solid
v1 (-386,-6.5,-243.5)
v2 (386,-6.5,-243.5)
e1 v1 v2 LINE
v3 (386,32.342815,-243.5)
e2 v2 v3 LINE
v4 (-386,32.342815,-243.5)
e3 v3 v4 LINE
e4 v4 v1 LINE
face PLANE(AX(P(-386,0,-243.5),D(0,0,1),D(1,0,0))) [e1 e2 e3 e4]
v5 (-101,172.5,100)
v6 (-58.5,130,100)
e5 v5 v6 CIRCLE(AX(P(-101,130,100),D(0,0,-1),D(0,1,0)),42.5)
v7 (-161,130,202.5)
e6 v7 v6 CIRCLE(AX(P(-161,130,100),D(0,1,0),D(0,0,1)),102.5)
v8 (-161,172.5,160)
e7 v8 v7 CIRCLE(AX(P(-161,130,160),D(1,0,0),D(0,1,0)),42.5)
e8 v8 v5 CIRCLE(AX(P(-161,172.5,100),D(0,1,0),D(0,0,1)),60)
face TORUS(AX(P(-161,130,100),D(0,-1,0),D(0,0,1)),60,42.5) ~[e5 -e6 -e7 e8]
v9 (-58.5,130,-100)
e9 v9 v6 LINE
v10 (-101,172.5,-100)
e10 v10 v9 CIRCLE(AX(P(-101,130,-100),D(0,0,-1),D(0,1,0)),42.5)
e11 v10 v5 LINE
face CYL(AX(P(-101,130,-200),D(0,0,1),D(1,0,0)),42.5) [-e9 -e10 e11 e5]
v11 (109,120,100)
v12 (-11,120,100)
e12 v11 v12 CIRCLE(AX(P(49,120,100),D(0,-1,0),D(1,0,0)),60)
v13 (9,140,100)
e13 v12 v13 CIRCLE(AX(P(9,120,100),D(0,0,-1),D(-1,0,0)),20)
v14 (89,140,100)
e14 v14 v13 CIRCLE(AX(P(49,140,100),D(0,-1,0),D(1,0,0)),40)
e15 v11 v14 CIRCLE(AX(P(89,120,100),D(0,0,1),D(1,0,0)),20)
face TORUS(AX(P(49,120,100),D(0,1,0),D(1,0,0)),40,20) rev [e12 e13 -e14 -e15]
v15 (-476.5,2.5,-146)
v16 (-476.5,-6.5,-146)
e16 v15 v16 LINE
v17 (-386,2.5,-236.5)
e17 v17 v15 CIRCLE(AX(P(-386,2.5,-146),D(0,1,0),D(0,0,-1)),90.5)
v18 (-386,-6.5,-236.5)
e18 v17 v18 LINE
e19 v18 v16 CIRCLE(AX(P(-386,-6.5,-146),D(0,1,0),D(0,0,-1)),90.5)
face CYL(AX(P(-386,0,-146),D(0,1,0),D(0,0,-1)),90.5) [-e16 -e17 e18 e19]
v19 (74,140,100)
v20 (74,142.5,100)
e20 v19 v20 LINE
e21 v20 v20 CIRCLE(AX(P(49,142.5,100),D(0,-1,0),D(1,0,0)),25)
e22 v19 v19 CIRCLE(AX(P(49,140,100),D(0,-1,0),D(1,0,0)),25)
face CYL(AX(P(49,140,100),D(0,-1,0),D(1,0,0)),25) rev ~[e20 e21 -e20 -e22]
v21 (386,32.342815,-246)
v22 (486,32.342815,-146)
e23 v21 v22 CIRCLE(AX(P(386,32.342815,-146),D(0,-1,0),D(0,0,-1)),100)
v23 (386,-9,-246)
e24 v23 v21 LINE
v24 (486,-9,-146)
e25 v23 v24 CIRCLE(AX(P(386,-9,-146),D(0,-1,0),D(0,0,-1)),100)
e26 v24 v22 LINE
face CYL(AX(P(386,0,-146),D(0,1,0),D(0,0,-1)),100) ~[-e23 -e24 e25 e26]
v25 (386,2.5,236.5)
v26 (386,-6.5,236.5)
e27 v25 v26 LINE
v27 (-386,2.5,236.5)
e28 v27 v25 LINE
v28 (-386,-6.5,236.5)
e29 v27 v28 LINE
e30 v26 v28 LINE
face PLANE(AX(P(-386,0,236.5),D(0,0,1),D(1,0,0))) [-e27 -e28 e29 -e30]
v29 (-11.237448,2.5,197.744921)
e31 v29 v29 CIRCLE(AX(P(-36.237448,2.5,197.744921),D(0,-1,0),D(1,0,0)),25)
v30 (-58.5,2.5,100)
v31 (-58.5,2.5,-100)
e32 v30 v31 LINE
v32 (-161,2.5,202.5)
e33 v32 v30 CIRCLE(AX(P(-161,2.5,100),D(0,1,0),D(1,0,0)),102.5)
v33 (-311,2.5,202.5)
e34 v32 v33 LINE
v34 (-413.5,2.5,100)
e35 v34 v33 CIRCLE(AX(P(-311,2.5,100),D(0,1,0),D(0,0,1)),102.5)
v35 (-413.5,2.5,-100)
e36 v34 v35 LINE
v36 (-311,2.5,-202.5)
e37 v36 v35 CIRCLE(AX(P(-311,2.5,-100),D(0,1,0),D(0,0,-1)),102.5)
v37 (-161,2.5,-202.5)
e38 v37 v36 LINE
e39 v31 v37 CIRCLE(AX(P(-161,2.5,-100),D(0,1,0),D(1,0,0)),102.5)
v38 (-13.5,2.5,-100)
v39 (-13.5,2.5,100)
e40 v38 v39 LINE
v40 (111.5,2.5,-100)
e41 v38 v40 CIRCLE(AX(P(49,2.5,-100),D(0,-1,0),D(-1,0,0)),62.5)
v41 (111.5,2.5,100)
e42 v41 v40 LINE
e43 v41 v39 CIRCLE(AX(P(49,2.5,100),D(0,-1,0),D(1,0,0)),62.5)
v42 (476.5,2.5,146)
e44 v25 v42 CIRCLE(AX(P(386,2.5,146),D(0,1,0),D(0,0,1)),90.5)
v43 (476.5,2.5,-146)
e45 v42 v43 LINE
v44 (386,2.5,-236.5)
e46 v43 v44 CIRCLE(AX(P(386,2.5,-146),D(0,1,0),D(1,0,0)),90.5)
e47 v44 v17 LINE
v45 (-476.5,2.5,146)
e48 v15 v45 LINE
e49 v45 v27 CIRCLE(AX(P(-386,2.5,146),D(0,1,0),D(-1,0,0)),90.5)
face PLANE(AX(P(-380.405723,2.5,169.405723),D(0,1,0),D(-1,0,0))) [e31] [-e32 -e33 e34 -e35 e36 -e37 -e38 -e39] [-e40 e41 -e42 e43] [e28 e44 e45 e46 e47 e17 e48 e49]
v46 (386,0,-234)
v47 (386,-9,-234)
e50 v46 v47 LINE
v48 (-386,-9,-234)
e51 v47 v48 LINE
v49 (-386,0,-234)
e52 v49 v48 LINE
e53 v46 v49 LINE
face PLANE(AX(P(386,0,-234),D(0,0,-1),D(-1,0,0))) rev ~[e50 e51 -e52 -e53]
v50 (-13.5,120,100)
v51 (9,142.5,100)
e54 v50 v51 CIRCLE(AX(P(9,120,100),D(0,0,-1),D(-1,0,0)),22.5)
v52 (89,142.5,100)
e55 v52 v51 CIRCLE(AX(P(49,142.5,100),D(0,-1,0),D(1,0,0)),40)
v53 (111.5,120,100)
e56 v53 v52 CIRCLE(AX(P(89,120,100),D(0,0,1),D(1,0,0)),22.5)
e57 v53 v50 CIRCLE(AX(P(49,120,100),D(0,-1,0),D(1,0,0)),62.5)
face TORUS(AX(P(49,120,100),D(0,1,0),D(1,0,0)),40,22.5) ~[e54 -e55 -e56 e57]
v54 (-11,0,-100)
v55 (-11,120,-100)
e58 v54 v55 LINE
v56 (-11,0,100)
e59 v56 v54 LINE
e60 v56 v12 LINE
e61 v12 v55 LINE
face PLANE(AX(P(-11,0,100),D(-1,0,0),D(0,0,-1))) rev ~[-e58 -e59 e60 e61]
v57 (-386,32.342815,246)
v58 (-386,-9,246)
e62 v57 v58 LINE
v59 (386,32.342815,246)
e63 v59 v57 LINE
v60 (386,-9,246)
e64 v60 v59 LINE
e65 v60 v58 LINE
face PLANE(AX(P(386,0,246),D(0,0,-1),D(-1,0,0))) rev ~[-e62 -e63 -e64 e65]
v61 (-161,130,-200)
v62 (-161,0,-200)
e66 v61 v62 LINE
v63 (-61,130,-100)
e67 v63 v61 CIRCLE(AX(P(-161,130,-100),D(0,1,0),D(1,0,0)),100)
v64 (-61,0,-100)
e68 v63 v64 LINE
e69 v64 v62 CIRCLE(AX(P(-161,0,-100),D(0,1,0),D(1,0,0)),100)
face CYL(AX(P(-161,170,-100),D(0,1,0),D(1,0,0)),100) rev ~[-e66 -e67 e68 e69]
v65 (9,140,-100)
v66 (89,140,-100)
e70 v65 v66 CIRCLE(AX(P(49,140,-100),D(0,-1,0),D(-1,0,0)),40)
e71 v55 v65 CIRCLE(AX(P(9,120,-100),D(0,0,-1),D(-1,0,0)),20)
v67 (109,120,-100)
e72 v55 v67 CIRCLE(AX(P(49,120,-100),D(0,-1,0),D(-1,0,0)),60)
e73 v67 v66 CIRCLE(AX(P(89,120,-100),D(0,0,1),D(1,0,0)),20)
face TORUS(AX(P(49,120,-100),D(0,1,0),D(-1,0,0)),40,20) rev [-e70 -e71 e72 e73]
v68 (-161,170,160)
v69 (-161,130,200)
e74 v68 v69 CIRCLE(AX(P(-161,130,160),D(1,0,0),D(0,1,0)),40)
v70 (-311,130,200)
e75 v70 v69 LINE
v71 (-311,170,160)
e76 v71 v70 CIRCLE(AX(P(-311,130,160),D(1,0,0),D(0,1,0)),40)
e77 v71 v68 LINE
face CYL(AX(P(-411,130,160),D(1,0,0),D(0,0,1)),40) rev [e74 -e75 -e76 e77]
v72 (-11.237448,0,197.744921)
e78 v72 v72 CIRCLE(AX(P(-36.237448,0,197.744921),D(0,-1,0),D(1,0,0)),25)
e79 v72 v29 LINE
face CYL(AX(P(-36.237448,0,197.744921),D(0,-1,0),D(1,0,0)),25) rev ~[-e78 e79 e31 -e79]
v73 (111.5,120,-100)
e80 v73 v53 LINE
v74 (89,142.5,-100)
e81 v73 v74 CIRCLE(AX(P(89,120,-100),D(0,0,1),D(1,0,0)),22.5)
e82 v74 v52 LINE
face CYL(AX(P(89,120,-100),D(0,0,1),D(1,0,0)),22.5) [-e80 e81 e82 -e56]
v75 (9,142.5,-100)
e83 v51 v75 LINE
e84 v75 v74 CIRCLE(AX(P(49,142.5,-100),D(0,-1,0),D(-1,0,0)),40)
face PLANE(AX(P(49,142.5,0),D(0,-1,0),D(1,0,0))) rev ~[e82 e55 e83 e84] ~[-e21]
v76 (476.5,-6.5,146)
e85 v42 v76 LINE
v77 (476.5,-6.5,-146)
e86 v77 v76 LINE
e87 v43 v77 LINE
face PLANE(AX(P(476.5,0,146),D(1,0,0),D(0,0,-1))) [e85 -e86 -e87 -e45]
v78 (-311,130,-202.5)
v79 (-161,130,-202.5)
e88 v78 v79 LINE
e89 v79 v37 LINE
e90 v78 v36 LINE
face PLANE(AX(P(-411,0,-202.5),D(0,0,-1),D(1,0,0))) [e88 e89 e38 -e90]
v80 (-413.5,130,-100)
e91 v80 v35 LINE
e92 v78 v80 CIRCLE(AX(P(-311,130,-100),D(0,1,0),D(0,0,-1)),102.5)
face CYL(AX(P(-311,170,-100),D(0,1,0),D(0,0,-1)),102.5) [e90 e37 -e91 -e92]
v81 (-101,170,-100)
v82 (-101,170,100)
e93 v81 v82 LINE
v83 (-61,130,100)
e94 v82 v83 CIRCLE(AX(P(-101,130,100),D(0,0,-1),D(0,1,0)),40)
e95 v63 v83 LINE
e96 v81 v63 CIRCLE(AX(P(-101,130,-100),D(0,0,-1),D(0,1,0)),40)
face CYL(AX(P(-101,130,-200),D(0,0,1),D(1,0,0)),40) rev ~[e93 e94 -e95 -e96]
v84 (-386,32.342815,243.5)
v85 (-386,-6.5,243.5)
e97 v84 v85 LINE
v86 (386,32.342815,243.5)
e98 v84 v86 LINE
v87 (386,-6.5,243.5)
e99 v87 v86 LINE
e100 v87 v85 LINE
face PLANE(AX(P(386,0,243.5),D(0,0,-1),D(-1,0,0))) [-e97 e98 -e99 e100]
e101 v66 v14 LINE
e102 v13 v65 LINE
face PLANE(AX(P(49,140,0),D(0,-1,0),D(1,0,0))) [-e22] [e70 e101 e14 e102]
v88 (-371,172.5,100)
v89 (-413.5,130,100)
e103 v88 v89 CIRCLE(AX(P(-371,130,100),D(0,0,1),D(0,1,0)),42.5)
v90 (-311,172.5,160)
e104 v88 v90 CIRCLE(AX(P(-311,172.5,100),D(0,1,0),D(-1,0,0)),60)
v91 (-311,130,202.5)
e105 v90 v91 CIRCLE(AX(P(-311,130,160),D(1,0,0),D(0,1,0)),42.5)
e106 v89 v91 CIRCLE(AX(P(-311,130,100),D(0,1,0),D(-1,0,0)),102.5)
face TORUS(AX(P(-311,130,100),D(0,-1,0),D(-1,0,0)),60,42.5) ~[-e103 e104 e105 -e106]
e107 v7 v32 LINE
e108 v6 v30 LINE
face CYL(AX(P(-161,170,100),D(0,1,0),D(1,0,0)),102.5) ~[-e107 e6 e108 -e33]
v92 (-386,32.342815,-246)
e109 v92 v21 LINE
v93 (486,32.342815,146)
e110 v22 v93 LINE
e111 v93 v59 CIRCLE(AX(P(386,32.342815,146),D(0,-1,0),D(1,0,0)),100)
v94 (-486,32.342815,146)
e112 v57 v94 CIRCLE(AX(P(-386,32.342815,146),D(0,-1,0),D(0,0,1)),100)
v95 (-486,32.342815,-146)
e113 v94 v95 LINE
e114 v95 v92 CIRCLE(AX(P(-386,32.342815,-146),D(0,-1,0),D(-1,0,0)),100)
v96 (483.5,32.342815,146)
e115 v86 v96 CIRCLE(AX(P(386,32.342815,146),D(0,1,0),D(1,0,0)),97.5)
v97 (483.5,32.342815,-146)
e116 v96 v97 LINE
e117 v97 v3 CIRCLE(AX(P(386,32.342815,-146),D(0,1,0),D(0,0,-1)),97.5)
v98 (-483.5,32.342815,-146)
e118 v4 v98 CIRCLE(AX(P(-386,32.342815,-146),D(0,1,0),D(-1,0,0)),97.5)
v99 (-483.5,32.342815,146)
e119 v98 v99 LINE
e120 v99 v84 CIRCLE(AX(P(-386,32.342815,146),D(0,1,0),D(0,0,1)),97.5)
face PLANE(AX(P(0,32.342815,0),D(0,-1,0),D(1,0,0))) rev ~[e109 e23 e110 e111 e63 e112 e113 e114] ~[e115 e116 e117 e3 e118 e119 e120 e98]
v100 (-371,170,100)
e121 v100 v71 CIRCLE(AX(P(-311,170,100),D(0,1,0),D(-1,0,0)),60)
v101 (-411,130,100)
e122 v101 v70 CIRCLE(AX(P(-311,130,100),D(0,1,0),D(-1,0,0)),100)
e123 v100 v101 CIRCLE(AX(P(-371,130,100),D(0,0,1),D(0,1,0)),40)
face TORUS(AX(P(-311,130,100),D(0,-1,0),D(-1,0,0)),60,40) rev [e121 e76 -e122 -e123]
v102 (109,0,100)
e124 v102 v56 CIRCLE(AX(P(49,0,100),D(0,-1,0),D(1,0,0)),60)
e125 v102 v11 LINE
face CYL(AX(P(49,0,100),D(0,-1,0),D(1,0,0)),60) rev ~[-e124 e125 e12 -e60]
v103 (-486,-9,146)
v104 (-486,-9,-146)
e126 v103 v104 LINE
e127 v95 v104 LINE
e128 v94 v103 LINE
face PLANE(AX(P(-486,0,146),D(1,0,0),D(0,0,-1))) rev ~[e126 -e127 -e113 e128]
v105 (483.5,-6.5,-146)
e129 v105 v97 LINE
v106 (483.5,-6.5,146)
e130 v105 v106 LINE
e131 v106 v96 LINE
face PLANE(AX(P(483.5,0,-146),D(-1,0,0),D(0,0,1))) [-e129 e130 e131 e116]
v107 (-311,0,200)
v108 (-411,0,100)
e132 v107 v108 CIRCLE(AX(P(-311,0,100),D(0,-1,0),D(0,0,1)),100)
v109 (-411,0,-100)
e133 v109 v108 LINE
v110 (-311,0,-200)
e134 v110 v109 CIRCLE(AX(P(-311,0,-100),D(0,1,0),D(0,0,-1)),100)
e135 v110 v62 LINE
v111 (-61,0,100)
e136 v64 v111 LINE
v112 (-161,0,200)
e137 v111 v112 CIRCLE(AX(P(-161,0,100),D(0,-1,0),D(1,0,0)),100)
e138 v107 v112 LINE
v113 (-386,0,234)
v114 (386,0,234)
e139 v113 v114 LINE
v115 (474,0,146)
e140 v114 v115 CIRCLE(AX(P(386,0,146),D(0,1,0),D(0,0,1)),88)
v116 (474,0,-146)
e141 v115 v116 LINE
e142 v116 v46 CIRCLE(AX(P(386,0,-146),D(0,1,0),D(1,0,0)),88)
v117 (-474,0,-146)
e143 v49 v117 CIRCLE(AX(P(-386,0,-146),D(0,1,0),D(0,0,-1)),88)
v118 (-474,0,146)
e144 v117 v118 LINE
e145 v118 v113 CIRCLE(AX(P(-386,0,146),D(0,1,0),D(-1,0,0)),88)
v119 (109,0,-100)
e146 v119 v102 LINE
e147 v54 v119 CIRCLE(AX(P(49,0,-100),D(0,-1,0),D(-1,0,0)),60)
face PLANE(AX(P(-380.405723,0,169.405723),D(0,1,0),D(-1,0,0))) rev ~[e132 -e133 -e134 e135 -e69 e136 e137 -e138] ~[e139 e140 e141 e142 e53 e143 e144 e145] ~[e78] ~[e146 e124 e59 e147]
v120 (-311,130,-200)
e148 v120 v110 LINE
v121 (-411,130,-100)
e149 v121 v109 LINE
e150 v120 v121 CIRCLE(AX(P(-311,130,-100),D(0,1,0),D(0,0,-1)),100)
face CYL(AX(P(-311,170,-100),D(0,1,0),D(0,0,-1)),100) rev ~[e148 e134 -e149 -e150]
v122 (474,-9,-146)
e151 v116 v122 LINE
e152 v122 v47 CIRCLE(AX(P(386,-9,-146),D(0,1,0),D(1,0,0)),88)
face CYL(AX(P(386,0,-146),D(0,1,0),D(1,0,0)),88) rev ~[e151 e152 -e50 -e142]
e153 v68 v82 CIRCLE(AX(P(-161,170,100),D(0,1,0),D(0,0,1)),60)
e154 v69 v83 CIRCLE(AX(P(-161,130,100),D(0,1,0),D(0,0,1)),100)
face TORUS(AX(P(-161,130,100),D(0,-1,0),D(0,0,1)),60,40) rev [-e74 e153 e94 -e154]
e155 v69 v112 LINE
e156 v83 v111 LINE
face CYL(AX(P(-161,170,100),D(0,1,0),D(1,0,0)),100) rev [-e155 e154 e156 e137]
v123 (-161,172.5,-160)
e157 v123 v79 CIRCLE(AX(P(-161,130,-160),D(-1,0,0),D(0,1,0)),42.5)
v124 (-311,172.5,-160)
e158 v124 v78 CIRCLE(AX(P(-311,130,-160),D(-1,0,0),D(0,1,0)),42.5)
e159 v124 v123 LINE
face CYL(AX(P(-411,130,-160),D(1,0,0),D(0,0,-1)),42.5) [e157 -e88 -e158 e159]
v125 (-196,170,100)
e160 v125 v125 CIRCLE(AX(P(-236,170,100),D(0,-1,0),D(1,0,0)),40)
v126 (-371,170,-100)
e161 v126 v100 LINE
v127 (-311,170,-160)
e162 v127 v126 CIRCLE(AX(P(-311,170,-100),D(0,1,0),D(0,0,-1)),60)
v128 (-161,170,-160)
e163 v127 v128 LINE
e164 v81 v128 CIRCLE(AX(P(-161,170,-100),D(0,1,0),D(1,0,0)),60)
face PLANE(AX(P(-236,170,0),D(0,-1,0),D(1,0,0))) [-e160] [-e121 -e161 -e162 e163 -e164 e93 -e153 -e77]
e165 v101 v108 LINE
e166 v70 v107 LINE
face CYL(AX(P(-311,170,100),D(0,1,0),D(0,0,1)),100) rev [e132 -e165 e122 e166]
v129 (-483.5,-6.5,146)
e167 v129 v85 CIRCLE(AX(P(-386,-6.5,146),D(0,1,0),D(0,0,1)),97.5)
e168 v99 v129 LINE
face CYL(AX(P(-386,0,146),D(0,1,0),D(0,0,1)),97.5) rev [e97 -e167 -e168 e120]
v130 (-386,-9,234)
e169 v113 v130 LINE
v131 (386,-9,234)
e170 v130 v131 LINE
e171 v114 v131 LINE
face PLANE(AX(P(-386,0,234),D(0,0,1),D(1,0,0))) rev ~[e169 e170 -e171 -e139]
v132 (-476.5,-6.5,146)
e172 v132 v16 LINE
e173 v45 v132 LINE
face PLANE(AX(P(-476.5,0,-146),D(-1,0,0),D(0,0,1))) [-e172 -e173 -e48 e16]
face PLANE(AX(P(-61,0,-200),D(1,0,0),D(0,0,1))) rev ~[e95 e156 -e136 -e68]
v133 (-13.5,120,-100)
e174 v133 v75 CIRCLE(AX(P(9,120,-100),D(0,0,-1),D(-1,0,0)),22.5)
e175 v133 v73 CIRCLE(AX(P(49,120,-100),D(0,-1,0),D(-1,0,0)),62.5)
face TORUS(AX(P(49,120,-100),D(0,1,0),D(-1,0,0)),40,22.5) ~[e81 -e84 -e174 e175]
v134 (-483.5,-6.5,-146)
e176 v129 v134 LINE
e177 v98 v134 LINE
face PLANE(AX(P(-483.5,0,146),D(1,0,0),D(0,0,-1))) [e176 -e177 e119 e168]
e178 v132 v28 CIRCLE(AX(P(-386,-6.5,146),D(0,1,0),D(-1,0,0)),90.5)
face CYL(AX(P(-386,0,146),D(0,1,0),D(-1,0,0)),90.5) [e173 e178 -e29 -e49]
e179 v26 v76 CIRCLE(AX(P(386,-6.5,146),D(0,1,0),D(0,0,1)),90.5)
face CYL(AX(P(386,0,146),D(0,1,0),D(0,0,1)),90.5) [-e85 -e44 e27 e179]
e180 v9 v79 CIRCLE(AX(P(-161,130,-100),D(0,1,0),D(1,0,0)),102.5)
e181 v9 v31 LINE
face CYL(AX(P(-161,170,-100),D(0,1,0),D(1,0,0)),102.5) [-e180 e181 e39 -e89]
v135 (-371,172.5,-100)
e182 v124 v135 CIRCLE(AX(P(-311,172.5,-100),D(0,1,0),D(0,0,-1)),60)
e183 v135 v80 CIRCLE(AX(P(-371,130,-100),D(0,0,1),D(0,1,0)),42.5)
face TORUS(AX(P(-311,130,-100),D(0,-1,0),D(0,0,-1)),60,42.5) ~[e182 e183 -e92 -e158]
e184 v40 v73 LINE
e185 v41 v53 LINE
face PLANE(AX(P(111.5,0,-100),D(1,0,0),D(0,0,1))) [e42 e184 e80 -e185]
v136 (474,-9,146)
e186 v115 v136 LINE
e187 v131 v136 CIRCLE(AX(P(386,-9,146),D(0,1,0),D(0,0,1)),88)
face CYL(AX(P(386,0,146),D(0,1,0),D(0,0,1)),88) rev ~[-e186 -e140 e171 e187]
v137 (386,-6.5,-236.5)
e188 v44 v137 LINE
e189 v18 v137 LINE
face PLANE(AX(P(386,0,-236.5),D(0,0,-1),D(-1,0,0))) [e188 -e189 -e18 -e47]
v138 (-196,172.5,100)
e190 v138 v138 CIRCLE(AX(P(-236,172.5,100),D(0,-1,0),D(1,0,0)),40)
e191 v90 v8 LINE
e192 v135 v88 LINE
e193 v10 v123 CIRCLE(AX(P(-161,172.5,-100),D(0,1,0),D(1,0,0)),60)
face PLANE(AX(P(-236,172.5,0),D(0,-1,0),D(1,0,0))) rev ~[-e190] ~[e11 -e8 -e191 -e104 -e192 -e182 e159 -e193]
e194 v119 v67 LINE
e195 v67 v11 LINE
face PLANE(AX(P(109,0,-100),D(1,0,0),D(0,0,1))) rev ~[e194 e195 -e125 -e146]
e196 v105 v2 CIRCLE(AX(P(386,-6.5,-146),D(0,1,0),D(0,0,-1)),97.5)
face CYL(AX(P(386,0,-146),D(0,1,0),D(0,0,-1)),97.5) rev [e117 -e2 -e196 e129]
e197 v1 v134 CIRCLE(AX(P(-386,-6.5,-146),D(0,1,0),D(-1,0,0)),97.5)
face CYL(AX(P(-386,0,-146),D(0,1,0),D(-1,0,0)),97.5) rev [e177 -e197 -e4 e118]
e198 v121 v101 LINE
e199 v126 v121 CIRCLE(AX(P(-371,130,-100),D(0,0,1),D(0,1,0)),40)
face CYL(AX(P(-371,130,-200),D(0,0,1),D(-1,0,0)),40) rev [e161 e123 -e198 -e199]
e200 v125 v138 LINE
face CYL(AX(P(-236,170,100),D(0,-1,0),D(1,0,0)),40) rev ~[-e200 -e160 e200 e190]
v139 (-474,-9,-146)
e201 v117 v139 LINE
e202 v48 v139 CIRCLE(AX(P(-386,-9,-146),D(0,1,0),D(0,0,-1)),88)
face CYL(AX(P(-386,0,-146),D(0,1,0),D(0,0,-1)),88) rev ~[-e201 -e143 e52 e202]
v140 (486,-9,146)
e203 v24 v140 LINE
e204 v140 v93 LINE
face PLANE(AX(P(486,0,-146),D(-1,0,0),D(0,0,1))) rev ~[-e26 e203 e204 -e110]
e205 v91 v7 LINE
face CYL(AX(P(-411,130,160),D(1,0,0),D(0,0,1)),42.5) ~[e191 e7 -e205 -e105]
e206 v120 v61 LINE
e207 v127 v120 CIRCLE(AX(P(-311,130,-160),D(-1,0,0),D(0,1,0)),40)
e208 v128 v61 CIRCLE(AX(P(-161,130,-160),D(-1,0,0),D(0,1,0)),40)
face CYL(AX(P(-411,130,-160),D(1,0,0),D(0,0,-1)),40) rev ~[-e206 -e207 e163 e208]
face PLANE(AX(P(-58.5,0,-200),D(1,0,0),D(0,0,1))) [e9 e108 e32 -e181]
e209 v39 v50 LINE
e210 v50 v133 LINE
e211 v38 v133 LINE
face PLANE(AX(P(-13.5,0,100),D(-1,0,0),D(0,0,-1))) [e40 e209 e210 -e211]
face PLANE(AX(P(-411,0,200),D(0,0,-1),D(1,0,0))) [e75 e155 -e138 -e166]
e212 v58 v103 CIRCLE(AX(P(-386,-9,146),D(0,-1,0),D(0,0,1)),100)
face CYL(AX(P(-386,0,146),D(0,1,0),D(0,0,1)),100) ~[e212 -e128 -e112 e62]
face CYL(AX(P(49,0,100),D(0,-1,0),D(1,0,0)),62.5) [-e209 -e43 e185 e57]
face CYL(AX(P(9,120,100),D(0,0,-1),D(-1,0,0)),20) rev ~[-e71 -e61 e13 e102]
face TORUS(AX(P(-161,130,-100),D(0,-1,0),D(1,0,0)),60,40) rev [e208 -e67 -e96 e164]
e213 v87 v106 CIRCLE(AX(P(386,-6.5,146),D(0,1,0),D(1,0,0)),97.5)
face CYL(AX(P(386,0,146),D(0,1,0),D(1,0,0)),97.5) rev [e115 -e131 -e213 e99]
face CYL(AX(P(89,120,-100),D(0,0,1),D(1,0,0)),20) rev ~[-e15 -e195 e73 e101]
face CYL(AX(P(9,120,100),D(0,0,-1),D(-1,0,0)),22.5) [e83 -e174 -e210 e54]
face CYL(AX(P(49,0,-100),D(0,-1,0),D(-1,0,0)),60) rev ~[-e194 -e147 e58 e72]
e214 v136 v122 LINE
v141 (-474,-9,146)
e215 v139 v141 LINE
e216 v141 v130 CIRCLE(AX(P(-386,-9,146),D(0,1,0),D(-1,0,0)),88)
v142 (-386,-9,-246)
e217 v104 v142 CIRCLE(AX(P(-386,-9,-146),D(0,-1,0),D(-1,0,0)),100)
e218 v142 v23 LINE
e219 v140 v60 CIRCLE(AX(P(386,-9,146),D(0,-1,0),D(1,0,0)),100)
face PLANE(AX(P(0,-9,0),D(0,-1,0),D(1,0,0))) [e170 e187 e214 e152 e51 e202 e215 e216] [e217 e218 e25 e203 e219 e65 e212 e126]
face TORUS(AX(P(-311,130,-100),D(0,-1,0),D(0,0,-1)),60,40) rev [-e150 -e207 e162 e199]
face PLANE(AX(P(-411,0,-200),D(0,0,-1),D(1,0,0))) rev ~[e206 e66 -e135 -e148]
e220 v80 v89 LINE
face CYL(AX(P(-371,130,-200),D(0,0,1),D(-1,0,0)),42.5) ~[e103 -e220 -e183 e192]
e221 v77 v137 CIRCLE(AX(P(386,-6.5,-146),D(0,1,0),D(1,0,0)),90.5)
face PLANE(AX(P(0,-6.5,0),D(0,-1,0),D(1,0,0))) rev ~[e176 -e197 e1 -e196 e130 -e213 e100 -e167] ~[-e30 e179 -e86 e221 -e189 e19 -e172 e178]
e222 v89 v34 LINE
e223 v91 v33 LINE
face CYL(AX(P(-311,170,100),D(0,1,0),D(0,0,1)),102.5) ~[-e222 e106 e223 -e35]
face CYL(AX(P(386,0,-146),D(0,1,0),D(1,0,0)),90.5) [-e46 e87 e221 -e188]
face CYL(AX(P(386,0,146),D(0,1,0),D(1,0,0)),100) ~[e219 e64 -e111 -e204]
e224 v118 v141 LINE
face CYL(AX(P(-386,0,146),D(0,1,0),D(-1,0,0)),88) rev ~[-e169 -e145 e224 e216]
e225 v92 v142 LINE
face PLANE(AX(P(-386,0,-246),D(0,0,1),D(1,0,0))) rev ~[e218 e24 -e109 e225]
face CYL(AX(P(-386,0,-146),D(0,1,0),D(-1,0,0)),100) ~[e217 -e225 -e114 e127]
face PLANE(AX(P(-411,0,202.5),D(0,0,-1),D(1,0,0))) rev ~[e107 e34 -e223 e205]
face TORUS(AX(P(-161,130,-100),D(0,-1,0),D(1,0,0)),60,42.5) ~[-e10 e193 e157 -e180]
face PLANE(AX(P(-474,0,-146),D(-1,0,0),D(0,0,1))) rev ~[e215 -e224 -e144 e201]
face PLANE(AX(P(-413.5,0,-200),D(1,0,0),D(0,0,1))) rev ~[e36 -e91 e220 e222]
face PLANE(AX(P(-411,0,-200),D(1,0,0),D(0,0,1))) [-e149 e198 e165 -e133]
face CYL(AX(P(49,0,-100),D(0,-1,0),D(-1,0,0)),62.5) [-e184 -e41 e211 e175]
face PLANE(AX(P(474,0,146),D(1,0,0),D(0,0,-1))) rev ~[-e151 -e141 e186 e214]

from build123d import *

# Parameters (mm, degrees)
F1_DEPTH     = 300
F2_W         = 350
F2_H         = 400
F3_DEPTH     = 170
F4_R         = 40
F5_T1_DEPTH  = 170
F5_T4_ANGLE  = 90
F5_T6_ANGLE  = 90
F5_T8_ANGLE  = 90
F5_T10_ANGLE = 90
F7_DEPTH     = 140
F8_R         = 20
F10_DEPTH    = 9
F11_T        = -2.5
F12_DEPTH    = 267.6571849734
F13_R        = 40
F14_DEPTH    = 2.501
F15_R        = 25
F16_DEPTH    = 32.501
F17_R        = 25
F18_DEPTH    = 172.501


# Not quite as in the source:
# - a fillet or chamfer that OpenCascade refuses, or shapes differently, is made with other operations: its cross-section is extruded or revolved along the edge and cut away or added


with BuildPart() as f1:
    # F0 (on Front) → F1 (new body)
    with BuildSketch(Plane.XZ):
        with BuildLine():
            Line((-386, -246), (386, -246))
            ThreePointArc((386, -246), (456.7106781187, -216.7106781187), (486, -146))
            Line((486, -146), (486, 146))
            ThreePointArc((486, 146), (456.7106781187, 216.7106781187), (386, 246))
            Line((386, 246), (-386, 246))
            ThreePointArc((-386, 246), (-456.7106781187, 216.7106781187), (-486, 146))
            Line((-486, 146), (-486, -146))
            ThreePointArc((-486, -146), (-456.7106781187, -216.7106781187), (-386, -246))
        make_face()
    extrude(amount=-F1_DEPTH)

    # F2 (on face) → F3 (cut)
    with BuildSketch(Plane.XZ):
        with Locations((-236, 0)):
            Rectangle(F2_W, F2_H)
    extrude(amount=-F3_DEPTH, mode=Mode.SUBTRACT)

    # F4
    f4_edges = [f1.edges().sort_by_distance(p)[0] for p in [
        (-61, 170, 0),
        (-236, 170, 200),
        (-411, 170, 0),
        (-236, 170, -200),
    ]]
    fillet(f4_edges, radius=F4_R)

    # F5: fillet of radius 100 on 4 edges, made by hand

    # F5_s2 → F5_t1 (join)
    with BuildSketch(Plane.XZ.offset(-170)):
        with BuildLine():
            ThreePointArc((-311, 200), (-381.7106781187, 170.7106781187), (-411, 100))
            Line((-411, 100), (-411, 200))
            Line((-411, 200), (-311, 200))
        make_face()
        with BuildLine():
            ThreePointArc((-311, -200), (-381.7106781187, -170.7106781187), (-411, -100))
            Line((-411, -100), (-411, -200))
            Line((-411, -200), (-311, -200))
        make_face()
        with BuildLine():
            ThreePointArc((-61, 100), (-90.2893218813, 170.7106781187), (-161, 200))
            Line((-161, 200), (-61, 200))
            Line((-61, 200), (-61, 100))
        make_face()
        with BuildLine():
            ThreePointArc((-61, -100), (-90.2893218813, -170.7106781187), (-161, -200))
            Line((-161, -200), (-61, -200))
            Line((-61, -200), (-61, -100))
        make_face()
    extrude(amount=F5_T1_DEPTH)

    # F5_s3 → F5_t4 (revolve)
    with BuildSketch(Plane.XY.offset(-100)):
        with BuildLine():
            ThreePointArc((-101, 170), (-72.7157287525, 158.2842712475), (-61, 130))
            Line((-61, 130), (-61, 170))
            Line((-61, 170), (-101, 170))
        make_face()
    revolve(axis=Axis((-161, 170, -100), (0, 1, 0)), revolution_arc=F5_T4_ANGLE)

    # F5_s5 → F5_t6 (revolve)
    with BuildSketch(Plane.YZ.offset(-161)):
        with BuildLine():
            ThreePointArc((170, 160), (158.2842712475, 188.2842712475), (130, 200))
            Line((130, 200), (170, 200))
            Line((170, 200), (170, 160))
        make_face()
    revolve(axis=Axis((-161, 170, 100), (0, 1, 0)), revolution_arc=F5_T6_ANGLE)

    # F5_s7 → F5_t8 (revolve)
    with BuildSketch(Plane.YZ.offset(-311)):
        with BuildLine():
            ThreePointArc((170, -160), (158.2842712475, -188.2842712475), (130, -200))
            Line((130, -200), (170, -200))
            Line((170, -200), (170, -160))
        make_face()
    revolve(axis=Axis((-311, 170, -100), (0, 1, 0)), revolution_arc=F5_T8_ANGLE)

    # F5_s9 → F5_t10 (revolve)
    with BuildSketch(Plane.XY.offset(100)):
        with BuildLine():
            ThreePointArc((-371, 170), (-399.2842712475, 158.2842712475), (-411, 130))
            Line((-411, 130), (-411, 170))
            Line((-411, 170), (-371, 170))
        make_face()
    revolve(axis=Axis((-311, 170, 100), (0, 1, 0)), revolution_arc=F5_T10_ANGLE)

    # F6 (on face) → F7 (cut)
    with BuildSketch(Plane.XZ):
        with BuildLine():
            ThreePointArc((-11, -100), (49, -160), (109, -100))
            Line((109, -100), (109, 100))
            ThreePointArc((109, 100), (49, 160), (-11, 100))
            Line((-11, 100), (-11, -100))
        make_face()
    extrude(amount=-F7_DEPTH, mode=Mode.SUBTRACT)

    # F8
    f8_edges = [f1.edges().sort_by_distance(p)[0] for p in [
        (49, 140, -160),
        (109, 140, 0),
        (49, 140, 160),
        (-11, 140, 0),
    ]]
    fillet(f8_edges, radius=F8_R)

    # F9 (on face) → F10 (join)
    with BuildSketch(Plane.XZ):
        with BuildLine():
            Line((386, 246), (-386, 246))
            ThreePointArc((-386, 246), (-456.7106781187, 216.7106781187), (-486, 146))
            Line((-486, 146), (-486, -146))
            ThreePointArc((-486, -146), (-456.7106781187, -216.7106781187), (-386, -246))
            Line((-386, -246), (386, -246))
            ThreePointArc((386, -246), (456.7106781187, -216.7106781187), (486, -146))
            Line((486, -146), (486, 146))
            ThreePointArc((486, 146), (456.7106781187, 216.7106781187), (386, 246))
        make_face()
        with BuildLine():
            ThreePointArc((386, 234), (448.2253967444, 208.2253967444), (474, 146))
            Line((474, 146), (474, -146))
            ThreePointArc((474, -146), (448.2253967444, -208.2253967444), (386, -234))
            Line((386, -234), (-386, -234))
            ThreePointArc((-386, -234), (-448.2253967444, -208.2253967444), (-474, -146))
            Line((-474, -146), (-474, 146))
            ThreePointArc((-474, 146), (-448.2253967444, 208.2253967444), (-386, 234))
            Line((-386, 234), (386, 234))
        make_face(mode=Mode.SUBTRACT)
    extrude(amount=F10_DEPTH)

    # F11
    f11_openings = [f1.faces().sort_by_distance(p)[0] for p in [
        (0, 300, 0),
    ]]
    offset(amount=F11_T, openings=f11_openings, kind=Kind.INTERSECTION)

    # F12 (cut): a face of the model
    f12_faces = [f1.faces().sort_by_distance(p)[0] for p in [
        (0, 300, -244.9105744633),
    ]]
    extrude(f12_faces, amount=-F12_DEPTH, mode=Mode.SUBTRACT)

    # F13 (on face) → F14 (cut, through all)
    with BuildSketch(Plane.XZ.offset(-170)):
        with Locations((-236, 100)):
            Circle(F13_R)
    extrude(amount=-F14_DEPTH, mode=Mode.SUBTRACT)

    # F15 (on face) → F16 (cut, through all)
    with BuildSketch(Plane.XZ.offset(-140)):
        with Locations((49, 100)):
            Circle(F15_R)
    extrude(amount=-F16_DEPTH, mode=Mode.SUBTRACT)

    # F17 (on face) → F18 (cut, through all)
    with BuildSketch(Plane.XZ):
        with Locations((-36.2374484539, 197.7449208498)):
            Circle(F17_R)
    extrude(amount=-F18_DEPTH, mode=Mode.SUBTRACT)


solid = f1.part
